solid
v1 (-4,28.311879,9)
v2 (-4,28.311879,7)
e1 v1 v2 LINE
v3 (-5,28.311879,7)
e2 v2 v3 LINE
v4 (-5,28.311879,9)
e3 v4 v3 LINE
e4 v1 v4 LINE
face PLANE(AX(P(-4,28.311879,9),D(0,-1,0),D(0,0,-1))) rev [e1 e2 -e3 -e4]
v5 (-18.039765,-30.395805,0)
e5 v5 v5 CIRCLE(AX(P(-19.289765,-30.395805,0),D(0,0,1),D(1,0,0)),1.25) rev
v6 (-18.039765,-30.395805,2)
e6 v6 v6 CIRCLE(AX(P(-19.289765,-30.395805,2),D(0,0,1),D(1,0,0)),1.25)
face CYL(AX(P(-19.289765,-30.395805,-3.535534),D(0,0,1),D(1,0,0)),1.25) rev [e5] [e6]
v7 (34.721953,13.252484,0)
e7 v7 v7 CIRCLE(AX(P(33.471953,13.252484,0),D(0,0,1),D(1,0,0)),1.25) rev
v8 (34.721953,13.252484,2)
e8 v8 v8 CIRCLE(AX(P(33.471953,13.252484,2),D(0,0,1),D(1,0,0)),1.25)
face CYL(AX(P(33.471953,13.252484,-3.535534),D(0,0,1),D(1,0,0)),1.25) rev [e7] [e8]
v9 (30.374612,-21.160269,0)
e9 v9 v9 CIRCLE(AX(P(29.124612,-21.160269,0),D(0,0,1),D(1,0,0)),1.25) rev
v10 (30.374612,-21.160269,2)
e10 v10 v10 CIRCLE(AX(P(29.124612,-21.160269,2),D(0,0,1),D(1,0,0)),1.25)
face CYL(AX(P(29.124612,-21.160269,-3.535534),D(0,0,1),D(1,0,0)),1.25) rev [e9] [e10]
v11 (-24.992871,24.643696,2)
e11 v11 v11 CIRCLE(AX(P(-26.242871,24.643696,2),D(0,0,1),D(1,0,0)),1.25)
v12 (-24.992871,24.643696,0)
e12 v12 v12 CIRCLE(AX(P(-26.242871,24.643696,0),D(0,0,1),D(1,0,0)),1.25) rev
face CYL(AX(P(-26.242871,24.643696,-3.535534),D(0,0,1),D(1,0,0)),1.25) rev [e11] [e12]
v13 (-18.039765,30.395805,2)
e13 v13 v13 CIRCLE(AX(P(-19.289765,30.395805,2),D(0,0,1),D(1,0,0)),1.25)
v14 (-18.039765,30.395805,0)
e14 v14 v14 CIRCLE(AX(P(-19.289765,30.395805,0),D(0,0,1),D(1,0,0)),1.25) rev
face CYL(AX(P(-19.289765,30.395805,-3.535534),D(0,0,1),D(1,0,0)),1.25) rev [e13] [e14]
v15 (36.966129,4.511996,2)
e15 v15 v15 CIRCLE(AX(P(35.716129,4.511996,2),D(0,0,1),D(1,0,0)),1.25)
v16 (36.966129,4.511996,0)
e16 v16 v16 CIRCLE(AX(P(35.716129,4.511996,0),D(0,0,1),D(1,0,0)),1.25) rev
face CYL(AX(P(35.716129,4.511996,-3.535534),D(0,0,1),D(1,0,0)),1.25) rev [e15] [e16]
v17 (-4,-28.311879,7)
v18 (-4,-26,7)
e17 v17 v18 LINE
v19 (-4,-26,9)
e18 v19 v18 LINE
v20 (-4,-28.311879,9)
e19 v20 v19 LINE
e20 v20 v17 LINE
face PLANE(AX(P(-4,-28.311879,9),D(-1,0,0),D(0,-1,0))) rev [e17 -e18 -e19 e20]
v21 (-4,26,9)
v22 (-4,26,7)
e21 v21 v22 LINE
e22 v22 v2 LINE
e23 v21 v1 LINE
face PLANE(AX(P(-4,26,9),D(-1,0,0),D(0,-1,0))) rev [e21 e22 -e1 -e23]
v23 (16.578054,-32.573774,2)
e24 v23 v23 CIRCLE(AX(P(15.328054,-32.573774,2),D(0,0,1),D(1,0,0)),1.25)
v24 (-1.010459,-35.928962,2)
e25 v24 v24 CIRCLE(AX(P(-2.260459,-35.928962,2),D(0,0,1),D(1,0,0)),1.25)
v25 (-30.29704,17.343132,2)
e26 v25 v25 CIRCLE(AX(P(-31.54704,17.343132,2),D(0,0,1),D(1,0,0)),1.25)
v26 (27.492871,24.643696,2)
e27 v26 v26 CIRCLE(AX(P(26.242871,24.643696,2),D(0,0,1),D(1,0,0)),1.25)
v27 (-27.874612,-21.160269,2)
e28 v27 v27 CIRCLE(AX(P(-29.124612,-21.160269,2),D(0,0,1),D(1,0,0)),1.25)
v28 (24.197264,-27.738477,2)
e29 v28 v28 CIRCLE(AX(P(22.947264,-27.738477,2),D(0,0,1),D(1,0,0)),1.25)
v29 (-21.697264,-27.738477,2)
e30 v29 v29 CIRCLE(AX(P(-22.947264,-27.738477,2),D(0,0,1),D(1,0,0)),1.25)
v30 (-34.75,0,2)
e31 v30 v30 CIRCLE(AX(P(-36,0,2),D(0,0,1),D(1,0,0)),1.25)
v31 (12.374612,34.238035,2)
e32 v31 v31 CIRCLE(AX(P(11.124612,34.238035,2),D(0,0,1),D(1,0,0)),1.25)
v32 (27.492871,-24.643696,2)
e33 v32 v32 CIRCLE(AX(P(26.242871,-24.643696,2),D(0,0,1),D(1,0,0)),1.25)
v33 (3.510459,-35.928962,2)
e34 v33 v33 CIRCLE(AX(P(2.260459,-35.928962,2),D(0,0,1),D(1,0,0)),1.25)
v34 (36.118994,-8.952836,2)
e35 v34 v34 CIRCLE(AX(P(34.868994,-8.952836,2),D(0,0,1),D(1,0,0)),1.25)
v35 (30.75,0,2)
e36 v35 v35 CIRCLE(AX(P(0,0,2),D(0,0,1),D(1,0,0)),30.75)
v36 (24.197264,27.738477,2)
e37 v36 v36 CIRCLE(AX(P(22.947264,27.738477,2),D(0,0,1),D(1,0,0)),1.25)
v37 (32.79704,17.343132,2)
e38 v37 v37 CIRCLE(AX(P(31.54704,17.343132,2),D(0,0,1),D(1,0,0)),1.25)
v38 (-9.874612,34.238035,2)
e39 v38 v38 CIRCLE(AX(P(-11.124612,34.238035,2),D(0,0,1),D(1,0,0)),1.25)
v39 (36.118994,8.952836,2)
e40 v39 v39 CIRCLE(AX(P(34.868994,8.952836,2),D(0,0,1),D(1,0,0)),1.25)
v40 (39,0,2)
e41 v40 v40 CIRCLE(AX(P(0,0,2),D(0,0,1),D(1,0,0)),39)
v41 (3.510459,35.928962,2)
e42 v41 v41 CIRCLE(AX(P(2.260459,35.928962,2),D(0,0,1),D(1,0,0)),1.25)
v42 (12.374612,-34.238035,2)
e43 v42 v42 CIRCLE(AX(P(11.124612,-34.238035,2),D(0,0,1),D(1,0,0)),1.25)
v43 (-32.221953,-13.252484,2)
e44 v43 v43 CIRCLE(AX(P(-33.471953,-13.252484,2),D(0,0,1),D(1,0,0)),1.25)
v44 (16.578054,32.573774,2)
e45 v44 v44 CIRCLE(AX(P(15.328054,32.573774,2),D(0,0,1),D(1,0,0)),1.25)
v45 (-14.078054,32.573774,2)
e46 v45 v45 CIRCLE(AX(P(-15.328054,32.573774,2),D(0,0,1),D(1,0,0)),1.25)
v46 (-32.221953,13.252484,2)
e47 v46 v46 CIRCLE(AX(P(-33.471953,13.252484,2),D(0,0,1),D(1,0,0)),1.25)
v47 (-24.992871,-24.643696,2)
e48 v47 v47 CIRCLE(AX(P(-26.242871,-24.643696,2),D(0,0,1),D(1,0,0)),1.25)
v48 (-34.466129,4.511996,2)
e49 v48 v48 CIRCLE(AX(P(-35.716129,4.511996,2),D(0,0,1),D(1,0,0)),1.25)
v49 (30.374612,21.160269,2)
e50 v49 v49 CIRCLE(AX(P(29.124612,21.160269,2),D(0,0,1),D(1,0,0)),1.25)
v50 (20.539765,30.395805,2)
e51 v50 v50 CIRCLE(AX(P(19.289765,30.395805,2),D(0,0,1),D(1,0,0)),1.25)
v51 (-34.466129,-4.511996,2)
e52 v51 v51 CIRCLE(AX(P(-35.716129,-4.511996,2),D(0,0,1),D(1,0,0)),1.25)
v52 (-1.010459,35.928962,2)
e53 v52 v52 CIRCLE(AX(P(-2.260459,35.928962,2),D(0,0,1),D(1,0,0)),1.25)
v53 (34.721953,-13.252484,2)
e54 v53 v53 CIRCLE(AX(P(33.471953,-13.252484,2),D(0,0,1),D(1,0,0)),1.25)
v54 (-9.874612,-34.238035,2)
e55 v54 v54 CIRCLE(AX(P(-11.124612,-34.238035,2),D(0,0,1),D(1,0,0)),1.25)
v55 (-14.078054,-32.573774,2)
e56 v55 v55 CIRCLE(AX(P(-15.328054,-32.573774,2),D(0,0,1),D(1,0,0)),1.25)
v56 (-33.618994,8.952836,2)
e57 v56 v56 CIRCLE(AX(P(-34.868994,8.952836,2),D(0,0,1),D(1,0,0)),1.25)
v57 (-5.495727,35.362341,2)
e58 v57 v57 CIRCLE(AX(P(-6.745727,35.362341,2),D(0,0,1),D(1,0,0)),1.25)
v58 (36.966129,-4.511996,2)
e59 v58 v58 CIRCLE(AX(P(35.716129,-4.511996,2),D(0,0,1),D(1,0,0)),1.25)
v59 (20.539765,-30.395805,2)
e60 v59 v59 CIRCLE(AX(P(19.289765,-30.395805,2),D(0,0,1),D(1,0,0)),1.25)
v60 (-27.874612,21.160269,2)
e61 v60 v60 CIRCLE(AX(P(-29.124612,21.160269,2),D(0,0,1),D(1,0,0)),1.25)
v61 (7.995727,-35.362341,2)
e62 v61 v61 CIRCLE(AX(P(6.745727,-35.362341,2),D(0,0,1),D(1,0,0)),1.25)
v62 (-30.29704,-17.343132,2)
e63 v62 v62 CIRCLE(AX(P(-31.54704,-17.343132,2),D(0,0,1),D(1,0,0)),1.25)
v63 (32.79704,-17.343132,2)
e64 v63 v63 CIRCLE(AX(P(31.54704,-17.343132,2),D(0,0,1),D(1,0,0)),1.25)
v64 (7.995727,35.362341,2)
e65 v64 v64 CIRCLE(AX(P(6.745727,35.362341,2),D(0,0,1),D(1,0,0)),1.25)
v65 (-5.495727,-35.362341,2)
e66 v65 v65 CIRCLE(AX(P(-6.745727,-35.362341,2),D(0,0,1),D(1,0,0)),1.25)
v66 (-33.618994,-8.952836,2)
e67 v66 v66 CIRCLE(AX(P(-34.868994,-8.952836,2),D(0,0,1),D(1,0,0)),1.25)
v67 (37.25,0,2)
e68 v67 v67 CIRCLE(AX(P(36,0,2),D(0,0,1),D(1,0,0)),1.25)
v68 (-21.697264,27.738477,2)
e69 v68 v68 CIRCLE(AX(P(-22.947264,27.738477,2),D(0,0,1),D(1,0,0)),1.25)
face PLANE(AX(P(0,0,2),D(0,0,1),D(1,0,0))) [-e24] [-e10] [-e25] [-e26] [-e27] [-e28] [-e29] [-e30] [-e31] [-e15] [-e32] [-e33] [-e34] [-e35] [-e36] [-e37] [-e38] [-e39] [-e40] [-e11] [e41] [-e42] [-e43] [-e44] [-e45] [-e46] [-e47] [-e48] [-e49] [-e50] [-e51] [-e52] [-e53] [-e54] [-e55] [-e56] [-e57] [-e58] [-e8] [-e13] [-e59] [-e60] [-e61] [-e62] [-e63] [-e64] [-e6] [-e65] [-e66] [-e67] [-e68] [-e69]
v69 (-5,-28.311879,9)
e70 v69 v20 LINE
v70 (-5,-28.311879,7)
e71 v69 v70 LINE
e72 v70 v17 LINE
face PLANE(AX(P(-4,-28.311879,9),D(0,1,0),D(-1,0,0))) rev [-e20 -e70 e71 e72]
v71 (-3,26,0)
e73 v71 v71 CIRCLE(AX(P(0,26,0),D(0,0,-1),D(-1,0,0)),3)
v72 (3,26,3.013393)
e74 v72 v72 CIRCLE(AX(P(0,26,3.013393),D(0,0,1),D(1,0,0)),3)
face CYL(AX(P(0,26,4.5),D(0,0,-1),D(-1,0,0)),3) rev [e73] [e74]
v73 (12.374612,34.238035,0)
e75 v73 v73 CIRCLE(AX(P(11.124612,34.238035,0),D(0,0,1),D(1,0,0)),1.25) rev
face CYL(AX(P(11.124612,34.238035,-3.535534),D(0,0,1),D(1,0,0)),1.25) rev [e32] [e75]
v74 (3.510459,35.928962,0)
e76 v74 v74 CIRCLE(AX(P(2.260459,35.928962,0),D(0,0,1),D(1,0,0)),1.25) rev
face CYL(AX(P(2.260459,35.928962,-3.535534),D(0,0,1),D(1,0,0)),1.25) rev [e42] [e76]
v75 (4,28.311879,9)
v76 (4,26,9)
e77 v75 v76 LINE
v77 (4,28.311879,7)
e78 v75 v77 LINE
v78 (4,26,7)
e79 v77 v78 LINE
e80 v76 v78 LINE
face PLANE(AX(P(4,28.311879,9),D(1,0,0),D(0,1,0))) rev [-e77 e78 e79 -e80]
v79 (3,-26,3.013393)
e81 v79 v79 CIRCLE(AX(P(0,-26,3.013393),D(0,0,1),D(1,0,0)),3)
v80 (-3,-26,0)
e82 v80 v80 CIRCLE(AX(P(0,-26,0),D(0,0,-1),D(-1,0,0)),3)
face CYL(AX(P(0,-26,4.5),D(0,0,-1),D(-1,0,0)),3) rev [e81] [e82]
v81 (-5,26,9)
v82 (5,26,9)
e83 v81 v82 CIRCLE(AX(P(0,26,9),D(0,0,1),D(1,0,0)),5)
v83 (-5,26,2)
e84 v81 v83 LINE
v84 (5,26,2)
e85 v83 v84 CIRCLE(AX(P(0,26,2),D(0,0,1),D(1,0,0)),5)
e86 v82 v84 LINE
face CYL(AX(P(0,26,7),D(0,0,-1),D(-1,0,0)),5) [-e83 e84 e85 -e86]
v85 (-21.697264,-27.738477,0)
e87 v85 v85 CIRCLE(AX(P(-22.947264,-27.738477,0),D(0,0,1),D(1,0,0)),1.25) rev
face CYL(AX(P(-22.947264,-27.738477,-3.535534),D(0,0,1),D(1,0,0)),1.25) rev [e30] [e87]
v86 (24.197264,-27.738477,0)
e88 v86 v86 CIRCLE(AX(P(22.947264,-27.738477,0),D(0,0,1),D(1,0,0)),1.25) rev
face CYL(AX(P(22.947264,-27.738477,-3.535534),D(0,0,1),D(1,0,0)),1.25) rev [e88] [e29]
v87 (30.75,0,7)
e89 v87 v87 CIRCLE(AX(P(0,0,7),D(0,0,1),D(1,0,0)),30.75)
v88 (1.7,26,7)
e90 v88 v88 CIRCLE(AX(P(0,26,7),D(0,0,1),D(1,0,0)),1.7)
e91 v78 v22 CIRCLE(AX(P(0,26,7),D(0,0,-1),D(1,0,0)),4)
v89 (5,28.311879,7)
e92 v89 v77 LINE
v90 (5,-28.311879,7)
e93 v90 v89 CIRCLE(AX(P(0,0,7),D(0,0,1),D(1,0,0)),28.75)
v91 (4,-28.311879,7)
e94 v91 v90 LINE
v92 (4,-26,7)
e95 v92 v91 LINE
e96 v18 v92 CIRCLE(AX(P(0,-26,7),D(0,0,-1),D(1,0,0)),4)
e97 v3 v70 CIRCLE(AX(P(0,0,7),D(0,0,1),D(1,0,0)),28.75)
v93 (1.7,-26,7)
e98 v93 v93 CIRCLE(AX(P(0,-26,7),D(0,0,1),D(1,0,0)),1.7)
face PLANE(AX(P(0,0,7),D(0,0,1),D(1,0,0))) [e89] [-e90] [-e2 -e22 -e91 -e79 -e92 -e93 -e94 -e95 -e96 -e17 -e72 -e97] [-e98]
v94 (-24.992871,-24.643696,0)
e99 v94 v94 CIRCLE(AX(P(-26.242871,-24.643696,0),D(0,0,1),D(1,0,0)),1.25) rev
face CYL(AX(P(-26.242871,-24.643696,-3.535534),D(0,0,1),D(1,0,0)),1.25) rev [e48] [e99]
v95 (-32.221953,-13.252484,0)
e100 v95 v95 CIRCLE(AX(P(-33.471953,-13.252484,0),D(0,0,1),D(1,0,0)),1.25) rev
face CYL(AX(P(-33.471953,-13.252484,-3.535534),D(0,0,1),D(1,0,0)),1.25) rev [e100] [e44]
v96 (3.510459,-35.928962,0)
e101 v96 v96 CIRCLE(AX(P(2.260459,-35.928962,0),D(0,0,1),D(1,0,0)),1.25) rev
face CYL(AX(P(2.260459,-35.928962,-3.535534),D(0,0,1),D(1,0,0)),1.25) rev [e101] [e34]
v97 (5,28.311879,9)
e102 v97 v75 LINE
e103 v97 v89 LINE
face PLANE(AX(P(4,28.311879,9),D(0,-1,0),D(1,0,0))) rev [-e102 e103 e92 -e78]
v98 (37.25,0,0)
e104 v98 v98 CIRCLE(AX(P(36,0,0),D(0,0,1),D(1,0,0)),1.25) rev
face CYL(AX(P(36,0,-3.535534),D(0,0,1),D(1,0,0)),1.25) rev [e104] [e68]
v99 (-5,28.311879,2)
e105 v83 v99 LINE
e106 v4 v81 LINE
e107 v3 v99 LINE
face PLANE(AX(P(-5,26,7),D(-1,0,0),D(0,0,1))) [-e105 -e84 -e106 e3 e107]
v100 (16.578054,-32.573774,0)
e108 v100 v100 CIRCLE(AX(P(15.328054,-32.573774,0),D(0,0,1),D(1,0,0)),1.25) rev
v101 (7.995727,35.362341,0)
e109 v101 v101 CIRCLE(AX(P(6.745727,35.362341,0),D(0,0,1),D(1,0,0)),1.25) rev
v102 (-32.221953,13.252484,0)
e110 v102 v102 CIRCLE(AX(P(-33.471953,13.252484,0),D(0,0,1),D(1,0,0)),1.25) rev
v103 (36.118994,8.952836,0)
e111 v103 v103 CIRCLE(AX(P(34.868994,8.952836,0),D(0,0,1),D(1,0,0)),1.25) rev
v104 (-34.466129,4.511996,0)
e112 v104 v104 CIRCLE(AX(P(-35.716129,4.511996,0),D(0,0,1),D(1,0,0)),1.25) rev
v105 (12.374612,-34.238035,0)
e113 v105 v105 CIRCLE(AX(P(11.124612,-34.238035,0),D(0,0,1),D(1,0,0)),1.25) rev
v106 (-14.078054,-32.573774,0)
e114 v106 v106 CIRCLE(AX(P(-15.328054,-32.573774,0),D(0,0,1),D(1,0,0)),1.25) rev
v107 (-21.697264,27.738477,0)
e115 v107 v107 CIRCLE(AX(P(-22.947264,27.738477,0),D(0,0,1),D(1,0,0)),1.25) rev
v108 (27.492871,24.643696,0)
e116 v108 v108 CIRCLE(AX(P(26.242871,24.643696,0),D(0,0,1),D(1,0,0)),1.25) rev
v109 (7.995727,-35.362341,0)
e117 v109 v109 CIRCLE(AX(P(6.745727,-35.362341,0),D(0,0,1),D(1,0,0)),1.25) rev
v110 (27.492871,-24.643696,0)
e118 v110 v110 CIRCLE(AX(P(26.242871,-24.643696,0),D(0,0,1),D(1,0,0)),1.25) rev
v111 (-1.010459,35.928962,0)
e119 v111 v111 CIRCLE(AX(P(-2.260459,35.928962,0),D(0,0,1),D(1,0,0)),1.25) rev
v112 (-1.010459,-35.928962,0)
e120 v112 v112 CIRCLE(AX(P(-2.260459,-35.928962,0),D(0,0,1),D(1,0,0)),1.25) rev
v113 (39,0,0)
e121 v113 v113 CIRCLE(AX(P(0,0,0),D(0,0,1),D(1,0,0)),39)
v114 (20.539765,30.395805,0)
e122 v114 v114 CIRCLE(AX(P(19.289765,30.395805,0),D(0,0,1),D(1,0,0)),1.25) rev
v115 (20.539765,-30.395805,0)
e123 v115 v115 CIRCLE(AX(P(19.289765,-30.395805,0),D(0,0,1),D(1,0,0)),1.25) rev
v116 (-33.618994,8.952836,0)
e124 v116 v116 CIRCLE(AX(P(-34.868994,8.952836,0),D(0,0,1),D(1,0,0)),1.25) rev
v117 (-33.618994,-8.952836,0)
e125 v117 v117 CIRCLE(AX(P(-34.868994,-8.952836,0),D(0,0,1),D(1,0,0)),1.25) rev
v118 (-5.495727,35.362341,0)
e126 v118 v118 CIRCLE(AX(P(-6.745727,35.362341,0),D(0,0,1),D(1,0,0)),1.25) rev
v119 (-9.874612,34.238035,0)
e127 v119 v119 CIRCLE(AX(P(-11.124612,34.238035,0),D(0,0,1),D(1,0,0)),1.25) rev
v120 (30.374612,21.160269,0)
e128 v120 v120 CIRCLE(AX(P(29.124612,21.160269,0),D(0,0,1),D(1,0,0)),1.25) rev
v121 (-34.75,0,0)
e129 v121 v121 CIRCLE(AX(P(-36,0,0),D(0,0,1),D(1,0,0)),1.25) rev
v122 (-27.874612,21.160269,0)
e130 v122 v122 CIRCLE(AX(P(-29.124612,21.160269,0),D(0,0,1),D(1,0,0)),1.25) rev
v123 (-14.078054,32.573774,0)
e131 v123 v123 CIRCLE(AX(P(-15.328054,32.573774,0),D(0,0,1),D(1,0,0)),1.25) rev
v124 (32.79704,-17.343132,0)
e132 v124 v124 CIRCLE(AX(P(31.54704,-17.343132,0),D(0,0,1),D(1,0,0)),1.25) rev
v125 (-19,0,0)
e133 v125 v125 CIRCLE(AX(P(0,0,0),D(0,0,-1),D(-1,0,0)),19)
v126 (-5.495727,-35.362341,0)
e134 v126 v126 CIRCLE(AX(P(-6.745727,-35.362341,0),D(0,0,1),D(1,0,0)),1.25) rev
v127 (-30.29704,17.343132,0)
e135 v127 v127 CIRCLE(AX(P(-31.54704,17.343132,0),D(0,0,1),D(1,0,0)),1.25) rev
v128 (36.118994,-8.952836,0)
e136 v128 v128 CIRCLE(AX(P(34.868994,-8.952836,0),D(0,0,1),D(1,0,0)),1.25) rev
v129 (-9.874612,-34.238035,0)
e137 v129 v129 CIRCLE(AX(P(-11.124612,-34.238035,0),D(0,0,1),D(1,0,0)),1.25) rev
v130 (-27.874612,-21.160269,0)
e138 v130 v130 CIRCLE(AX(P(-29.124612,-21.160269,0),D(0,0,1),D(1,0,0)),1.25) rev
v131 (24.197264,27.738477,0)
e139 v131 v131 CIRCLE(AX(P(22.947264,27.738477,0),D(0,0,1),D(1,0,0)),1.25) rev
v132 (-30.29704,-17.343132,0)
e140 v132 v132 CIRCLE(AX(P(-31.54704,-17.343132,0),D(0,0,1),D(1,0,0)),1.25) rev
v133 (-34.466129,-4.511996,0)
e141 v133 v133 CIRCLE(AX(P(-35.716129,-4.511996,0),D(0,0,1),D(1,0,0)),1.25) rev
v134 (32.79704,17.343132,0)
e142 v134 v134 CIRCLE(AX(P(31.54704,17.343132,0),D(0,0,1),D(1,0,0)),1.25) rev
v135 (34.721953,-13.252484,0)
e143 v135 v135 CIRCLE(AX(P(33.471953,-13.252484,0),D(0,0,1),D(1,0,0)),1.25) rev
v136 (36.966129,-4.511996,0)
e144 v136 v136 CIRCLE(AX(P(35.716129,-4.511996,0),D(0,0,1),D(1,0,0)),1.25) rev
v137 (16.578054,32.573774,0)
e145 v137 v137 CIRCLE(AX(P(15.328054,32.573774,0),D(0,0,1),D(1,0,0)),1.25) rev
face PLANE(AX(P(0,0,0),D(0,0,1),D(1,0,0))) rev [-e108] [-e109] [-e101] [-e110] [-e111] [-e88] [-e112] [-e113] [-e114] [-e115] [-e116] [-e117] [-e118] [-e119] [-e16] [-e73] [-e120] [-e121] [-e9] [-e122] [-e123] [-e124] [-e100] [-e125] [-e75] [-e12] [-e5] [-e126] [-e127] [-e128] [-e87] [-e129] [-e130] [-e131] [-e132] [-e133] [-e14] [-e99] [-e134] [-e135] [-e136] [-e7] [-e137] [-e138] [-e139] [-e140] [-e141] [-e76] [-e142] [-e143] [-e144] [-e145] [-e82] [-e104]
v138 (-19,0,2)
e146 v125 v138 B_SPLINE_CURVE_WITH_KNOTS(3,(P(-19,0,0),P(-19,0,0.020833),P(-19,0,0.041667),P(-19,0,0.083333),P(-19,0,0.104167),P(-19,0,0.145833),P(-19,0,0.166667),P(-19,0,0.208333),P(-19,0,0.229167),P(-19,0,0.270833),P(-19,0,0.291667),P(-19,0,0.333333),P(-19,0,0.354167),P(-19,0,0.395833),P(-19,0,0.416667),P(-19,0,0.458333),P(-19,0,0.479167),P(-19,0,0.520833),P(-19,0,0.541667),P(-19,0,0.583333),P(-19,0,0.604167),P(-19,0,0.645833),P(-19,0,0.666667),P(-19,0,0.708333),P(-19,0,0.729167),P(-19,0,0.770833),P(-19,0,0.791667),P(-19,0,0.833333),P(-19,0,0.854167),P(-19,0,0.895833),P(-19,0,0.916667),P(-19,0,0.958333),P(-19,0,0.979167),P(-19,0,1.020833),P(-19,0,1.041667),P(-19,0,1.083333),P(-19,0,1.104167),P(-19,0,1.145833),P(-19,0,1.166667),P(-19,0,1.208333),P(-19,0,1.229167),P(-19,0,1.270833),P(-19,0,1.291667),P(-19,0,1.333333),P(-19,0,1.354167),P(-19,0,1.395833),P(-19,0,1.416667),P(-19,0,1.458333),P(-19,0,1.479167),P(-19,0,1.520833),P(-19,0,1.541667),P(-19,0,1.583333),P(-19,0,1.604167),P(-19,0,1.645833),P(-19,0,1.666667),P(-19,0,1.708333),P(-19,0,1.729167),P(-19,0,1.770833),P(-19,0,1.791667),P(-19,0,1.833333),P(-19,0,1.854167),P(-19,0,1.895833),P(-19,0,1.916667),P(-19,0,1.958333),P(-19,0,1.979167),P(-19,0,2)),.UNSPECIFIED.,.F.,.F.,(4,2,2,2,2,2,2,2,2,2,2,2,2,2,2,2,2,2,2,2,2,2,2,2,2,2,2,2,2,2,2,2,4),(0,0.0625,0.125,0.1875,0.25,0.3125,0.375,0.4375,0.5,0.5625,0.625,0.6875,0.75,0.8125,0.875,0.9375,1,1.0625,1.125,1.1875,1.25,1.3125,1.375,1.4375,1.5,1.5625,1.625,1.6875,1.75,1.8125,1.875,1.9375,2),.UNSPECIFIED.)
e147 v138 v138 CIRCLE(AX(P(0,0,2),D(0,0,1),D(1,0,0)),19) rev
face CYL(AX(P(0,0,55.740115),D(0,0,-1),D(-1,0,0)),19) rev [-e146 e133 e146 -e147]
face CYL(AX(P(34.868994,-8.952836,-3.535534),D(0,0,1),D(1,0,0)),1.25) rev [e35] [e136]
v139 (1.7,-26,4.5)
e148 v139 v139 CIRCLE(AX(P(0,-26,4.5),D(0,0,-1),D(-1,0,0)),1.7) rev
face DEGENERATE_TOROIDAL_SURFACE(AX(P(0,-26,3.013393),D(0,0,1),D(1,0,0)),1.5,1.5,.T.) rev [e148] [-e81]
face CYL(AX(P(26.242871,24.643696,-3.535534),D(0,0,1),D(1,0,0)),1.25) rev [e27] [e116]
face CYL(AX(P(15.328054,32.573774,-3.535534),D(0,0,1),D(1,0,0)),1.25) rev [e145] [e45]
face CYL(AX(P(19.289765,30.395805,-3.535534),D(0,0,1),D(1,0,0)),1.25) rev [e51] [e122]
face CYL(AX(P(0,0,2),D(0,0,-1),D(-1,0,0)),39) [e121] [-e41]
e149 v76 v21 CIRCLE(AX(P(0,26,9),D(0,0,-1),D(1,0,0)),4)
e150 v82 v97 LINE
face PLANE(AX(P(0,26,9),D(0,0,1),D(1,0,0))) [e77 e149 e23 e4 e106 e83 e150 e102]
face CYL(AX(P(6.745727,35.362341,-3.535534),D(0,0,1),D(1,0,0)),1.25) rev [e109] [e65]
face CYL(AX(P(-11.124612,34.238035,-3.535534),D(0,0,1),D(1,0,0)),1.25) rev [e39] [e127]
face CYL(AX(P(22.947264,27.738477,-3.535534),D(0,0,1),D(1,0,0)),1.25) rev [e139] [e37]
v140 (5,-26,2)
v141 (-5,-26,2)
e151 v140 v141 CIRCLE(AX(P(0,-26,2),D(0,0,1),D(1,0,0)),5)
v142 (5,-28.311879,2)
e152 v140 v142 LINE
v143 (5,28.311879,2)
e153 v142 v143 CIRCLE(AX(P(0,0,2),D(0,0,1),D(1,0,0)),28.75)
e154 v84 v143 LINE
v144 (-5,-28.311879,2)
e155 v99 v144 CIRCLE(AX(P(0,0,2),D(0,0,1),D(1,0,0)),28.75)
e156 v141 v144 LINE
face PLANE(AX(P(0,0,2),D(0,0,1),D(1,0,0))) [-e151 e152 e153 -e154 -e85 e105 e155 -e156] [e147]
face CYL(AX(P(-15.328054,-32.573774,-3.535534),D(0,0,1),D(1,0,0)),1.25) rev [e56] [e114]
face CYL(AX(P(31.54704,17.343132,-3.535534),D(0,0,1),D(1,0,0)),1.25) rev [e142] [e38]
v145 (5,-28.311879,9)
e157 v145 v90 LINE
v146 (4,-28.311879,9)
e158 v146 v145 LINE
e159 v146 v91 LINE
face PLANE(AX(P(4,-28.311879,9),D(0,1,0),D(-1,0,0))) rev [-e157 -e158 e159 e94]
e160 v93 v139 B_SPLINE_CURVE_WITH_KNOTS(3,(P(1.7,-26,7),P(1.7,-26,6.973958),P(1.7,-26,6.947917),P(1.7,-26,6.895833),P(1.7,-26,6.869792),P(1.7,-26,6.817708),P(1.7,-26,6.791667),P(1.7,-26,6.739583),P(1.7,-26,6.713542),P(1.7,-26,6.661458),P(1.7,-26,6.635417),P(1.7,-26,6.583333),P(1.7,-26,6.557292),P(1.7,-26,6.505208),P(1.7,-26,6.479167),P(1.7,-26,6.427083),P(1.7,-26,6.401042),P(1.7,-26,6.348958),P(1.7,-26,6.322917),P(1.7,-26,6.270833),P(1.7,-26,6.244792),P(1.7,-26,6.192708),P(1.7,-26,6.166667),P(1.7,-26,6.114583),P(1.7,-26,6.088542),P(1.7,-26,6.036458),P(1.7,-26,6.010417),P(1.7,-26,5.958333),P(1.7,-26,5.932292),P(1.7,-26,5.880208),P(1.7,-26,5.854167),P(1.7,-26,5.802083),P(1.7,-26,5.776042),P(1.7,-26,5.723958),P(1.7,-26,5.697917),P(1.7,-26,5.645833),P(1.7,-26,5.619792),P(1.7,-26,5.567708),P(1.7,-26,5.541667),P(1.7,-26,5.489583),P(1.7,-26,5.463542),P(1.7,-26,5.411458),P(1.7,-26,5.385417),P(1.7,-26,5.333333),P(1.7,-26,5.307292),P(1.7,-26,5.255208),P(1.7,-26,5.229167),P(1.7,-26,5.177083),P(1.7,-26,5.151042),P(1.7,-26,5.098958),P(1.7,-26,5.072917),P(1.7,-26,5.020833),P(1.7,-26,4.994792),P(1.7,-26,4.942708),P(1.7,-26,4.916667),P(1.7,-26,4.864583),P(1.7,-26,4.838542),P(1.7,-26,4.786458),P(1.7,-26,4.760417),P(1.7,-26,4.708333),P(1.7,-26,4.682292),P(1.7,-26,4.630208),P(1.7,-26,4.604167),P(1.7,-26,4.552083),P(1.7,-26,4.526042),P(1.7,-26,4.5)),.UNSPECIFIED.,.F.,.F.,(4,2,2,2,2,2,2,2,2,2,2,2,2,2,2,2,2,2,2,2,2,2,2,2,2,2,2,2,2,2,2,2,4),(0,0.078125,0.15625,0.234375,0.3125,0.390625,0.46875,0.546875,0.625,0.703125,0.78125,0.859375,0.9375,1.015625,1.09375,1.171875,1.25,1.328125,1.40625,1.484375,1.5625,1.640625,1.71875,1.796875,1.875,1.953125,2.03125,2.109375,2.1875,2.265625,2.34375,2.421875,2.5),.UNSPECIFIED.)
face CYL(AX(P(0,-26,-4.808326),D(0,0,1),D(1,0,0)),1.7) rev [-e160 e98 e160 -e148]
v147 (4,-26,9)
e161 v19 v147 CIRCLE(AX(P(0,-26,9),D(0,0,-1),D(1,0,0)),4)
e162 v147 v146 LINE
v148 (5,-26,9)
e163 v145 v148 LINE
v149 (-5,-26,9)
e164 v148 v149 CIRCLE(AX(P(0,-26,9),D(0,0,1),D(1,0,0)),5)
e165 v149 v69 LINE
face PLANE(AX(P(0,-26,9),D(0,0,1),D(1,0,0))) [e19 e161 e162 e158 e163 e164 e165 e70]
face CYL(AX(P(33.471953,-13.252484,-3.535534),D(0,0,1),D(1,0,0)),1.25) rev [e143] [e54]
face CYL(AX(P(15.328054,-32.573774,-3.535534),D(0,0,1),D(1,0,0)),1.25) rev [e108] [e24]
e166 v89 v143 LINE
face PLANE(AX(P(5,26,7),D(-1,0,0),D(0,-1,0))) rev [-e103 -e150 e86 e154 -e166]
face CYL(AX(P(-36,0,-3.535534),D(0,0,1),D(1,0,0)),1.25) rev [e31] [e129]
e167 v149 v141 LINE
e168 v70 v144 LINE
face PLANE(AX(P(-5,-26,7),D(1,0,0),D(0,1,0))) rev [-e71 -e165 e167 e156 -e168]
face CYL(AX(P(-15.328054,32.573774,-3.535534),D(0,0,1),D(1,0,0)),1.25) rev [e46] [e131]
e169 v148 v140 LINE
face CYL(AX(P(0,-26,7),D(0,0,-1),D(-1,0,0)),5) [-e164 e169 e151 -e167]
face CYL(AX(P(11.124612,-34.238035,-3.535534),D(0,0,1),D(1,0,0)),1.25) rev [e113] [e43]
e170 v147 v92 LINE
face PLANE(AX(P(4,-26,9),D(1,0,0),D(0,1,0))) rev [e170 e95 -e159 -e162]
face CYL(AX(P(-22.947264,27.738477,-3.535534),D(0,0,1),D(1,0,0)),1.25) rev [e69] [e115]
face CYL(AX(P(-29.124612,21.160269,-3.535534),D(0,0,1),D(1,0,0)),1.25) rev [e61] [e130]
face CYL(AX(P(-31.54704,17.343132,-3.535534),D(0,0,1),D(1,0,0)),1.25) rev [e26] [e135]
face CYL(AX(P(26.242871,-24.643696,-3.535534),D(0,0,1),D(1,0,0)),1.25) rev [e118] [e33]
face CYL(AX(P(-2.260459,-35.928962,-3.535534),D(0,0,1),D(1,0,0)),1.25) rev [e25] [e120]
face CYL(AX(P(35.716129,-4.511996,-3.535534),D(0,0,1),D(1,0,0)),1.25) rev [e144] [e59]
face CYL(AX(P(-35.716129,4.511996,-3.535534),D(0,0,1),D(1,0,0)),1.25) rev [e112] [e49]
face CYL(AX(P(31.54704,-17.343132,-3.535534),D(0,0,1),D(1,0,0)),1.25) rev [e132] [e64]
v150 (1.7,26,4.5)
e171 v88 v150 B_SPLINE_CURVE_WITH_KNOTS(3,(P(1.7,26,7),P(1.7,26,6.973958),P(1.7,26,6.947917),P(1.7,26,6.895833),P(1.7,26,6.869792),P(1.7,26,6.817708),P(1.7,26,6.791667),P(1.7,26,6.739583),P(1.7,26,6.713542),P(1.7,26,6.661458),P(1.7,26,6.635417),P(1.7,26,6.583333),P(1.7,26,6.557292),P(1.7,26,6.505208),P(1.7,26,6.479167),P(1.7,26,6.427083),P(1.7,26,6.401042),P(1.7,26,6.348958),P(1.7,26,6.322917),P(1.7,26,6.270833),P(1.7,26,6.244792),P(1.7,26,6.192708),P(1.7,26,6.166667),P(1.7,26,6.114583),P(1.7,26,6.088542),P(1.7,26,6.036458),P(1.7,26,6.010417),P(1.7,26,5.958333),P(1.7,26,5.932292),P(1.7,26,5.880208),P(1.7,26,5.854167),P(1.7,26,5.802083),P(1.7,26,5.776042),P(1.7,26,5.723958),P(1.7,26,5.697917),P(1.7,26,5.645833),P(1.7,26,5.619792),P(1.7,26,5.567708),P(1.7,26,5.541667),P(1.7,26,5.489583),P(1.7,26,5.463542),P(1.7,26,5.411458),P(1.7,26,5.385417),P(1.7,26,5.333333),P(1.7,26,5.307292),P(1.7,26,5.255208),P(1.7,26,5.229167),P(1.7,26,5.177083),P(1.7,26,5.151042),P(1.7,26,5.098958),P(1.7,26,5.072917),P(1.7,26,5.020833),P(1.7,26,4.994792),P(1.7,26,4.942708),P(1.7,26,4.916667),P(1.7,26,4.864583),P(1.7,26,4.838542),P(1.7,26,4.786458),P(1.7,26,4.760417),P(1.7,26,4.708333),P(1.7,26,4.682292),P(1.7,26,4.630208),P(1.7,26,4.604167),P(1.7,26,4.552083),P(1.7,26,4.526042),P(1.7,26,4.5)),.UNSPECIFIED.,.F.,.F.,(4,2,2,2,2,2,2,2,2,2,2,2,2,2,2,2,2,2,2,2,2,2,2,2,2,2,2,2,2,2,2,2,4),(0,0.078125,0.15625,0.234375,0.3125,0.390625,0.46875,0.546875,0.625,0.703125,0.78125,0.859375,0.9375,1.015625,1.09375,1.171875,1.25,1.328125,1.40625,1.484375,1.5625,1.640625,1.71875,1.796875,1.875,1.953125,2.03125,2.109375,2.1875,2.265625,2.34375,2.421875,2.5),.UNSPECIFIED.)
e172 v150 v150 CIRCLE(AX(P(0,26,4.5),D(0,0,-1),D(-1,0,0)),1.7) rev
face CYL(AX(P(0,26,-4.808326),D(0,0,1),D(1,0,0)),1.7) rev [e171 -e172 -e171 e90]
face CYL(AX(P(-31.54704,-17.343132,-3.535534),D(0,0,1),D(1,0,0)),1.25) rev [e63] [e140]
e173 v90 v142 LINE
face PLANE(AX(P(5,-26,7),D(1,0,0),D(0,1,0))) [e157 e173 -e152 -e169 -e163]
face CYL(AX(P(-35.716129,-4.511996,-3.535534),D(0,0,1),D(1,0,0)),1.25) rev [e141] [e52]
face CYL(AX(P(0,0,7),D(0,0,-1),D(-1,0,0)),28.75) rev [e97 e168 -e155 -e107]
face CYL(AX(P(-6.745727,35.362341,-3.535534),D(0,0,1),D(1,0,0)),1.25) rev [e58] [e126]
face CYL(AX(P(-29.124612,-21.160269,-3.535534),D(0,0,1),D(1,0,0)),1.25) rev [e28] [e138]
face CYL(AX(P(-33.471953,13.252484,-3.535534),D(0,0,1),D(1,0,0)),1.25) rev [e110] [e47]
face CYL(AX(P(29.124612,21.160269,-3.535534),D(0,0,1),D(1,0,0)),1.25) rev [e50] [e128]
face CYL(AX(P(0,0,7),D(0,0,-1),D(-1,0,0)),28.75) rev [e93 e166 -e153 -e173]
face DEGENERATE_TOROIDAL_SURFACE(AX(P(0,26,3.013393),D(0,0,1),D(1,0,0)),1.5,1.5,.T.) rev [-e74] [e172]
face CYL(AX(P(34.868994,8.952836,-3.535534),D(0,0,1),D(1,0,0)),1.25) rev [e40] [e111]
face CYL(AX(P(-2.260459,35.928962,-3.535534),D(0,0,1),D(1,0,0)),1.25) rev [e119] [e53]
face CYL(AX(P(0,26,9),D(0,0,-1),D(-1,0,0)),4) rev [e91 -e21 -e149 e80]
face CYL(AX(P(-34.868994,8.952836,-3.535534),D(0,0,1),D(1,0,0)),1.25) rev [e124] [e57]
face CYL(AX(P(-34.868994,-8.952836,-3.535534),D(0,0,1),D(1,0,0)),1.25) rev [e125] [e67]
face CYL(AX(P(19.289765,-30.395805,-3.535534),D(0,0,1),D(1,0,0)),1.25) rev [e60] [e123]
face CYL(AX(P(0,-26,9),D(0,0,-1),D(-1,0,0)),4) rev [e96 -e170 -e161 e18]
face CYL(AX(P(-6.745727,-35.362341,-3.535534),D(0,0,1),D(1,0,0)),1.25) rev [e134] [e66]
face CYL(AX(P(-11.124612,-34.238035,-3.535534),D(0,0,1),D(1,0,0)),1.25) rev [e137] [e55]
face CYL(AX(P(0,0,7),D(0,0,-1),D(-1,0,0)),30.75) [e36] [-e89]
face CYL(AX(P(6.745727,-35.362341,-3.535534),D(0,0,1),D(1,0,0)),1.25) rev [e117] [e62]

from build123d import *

# Parameters (mm, degrees)
SKETCH1_R           = 39
BOSS_EXTRUDE1_DEPTH = 2
SKETCH3_R           = 30.75
BOSS_EXTRUDE2_DEPTH = 5
SKETCH5_R           = 1.7
CUT_EXTRUDE2_DEPTH  = 7
SKETCH6_R           = 3
CUT_EXTRUDE3_DEPTH  = 4.5
SKETCH7_R           = 19
CUT_EXTRUDE4_DEPTH  = 2
SKETCH8_R           = 1.25
CUT_EXTRUDE5_DEPTH  = 2
FILLET1_R           = 1.5
BOSS_EXTRUDE3_DEPTH = 2


with BuildPart() as part:
    # Sketch1 → Boss-Extrude1 (new body)
    with BuildSketch(Plane.XY):
        Circle(SKETCH1_R)
    extrude(amount=BOSS_EXTRUDE1_DEPTH)

    # Sketch3 → Boss-Extrude2 (add)
    with BuildSketch(Plane.XY.offset(2)):
        Circle(SKETCH3_R)
        with BuildLine():
            Line((-5, 26), (-5, 28.311879132))
            ThreePointArc((-5, 28.311879132), (-28.75, 0), (-5, -28.311879132))
            Line((-5, -28.311879132), (-5, -26))
            ThreePointArc((-5, -26), (0, -21), (5, -26))
            Line((5, -26), (5, -28.311879132))
            ThreePointArc((5, -28.311879132), (28.75, 0), (5, 28.311879132))
            Line((5, 28.311879132), (5, 26))
            ThreePointArc((5, 26), (0, 21), (-5, 26))
        make_face(mode=Mode.SUBTRACT)
    extrude(amount=BOSS_EXTRUDE2_DEPTH)

    # Sketch5 → Cut-Extrude2 (cut)
    with BuildSketch(Plane.XY.offset(7)):
        with Locations((0, -26)):
            Circle(SKETCH5_R)
        with Locations((0, 26)):
            Circle(SKETCH5_R)
    extrude(amount=-CUT_EXTRUDE2_DEPTH, mode=Mode.SUBTRACT)

    # Sketch6 → Cut-Extrude3 (cut)
    with BuildSketch(Plane(origin=(0, 0, 0), x_dir=(-1, 0, 0), z_dir=(0, 0, -1))):
        with Locations((0, 26)):
            Circle(SKETCH6_R)
        with Locations((0, -26)):
            Circle(SKETCH6_R)
    extrude(amount=-CUT_EXTRUDE3_DEPTH, mode=Mode.SUBTRACT)

    # Sketch7 → Cut-Extrude4 (cut)
    with BuildSketch(Plane(origin=(0, 0, 0), x_dir=(-1, 0, 0), z_dir=(0, 0, -1))):
        Circle(SKETCH7_R)
    extrude(amount=-CUT_EXTRUDE4_DEPTH, mode=Mode.SUBTRACT)

    # Sketch8 → Cut-Extrude5 (cut)
    with BuildSketch(Plane.XY.offset(2)):
        with Locations((36, 0)):
            Circle(SKETCH8_R)
        with Locations((35.716129247, -4.511996408)):
            Circle(SKETCH8_R)
        with Locations((34.868993801, -8.952835938)):
            Circle(SKETCH8_R)
        with Locations((33.471953492, -13.252483897)):
            Circle(SKETCH8_R)
        with Locations((31.547040482, -17.343132268)):
            Circle(SKETCH8_R)
        with Locations((29.124611797, -21.160269083)):
            Circle(SKETCH8_R)
        with Locations((26.242870587, -24.643695813)):
            Circle(SKETCH8_R)
        with Locations((22.947263631, -27.73847674)):
            Circle(SKETCH8_R)
        with Locations((19.289764619, -30.395805318)):
            Circle(SKETCH8_R)
        with Locations((15.328054496, -32.573773889)):
            Circle(SKETCH8_R)
        with Locations((11.124611797, -34.238034587)):
            Circle(SKETCH8_R)
        with Locations((6.745727325, -35.362341026)):
            Circle(SKETCH8_R)
        with Locations((2.260458703, -35.928962223)):
            Circle(SKETCH8_R)
        with Locations((-2.260458703, -35.928962223)):
            Circle(SKETCH8_R)
        with Locations((-6.745727325, -35.362341026)):
            Circle(SKETCH8_R)
        with Locations((-11.124611797, -34.238034587)):
            Circle(SKETCH8_R)
        with Locations((-15.328054496, -32.573773889)):
            Circle(SKETCH8_R)
        with Locations((-19.289764619, -30.395805318)):
            Circle(SKETCH8_R)
        with Locations((-22.947263631, -27.73847674)):
            Circle(SKETCH8_R)
        with Locations((-26.242870587, -24.643695813)):
            Circle(SKETCH8_R)
        with Locations((-29.124611797, -21.160269083)):
            Circle(SKETCH8_R)
        with Locations((-31.547040482, -17.343132268)):
            Circle(SKETCH8_R)
        with Locations((-33.471953492, -13.252483897)):
            Circle(SKETCH8_R)
        with Locations((-34.868993801, -8.952835938)):
            Circle(SKETCH8_R)
        with Locations((-35.716129247, -4.511996408)):
            Circle(SKETCH8_R)
        with Locations((-36, 0)):
            Circle(SKETCH8_R)
        with Locations((-35.716129247, 4.511996408)):
            Circle(SKETCH8_R)
        with Locations((-34.868993801, 8.952835938)):
            Circle(SKETCH8_R)
        with Locations((-33.471953492, 13.252483897)):
            Circle(SKETCH8_R)
        with Locations((-31.547040482, 17.343132268)):
            Circle(SKETCH8_R)
        with Locations((-29.124611797, 21.160269083)):
            Circle(SKETCH8_R)
        with Locations((-26.242870587, 24.643695813)):
            Circle(SKETCH8_R)
        with Locations((-22.947263631, 27.73847674)):
            Circle(SKETCH8_R)
        with Locations((-19.289764619, 30.395805318)):
            Circle(SKETCH8_R)
        with Locations((-15.328054496, 32.573773889)):
            Circle(SKETCH8_R)
        with Locations((-11.124611797, 34.238034587)):
            Circle(SKETCH8_R)
        with Locations((-6.745727325, 35.362341026)):
            Circle(SKETCH8_R)
        with Locations((-2.260458703, 35.928962223)):
            Circle(SKETCH8_R)
        with Locations((2.260458703, 35.928962223)):
            Circle(SKETCH8_R)
        with Locations((6.745727325, 35.362341026)):
            Circle(SKETCH8_R)
        with Locations((11.124611797, 34.238034587)):
            Circle(SKETCH8_R)
        with Locations((15.328054496, 32.573773889)):
            Circle(SKETCH8_R)
        with Locations((19.289764619, 30.395805318)):
            Circle(SKETCH8_R)
        with Locations((22.947263631, 27.73847674)):
            Circle(SKETCH8_R)
        with Locations((26.242870587, 24.643695813)):
            Circle(SKETCH8_R)
        with Locations((29.124611797, 21.160269083)):
            Circle(SKETCH8_R)
        with Locations((31.547040482, 17.343132268)):
            Circle(SKETCH8_R)
        with Locations((33.471953492, 13.252483897)):
            Circle(SKETCH8_R)
        with Locations((34.868993801, 8.952835938)):
            Circle(SKETCH8_R)
        with Locations((35.716129247, 4.511996408)):
            Circle(SKETCH8_R)
    extrude(amount=-CUT_EXTRUDE5_DEPTH, mode=Mode.SUBTRACT)

    # Fillet1
    # the kernel refuses this fillet: 1.5 mm, written as the material it adds along each edge
    with BuildSketch(Plane(origin=(0, 26, 4.5), x_dir=(-1, 0, 0), z_dir=(0, -1, 0))) as fillet1_piece_1:
        with BuildLine():
            CenterArc((1.5, 1.486606875), FILLET1_R, 277.662255661, 82.337744339)
            Line((1.7, 0), (1.704, -0.029732137))
            ThreePointArc((1.704, -0.029732137), (2.35, -0.03), (3, -0.03))
            Line((3, -0.03), (3.03, 0))
            Line((3.03, 0), (3.03, 1.486606875))
            Line((3.03, 1.486606875), (3, 1.486606875))
        make_face()
    revolve(axis=Axis((0, 26, 4.5), (0, 0, -1)))
    with BuildSketch(Plane(origin=(0, -26, 4.5), x_dir=(-1, 0, 0), z_dir=(0, -1, 0))) as fillet1_piece_2:
        with BuildLine():
            CenterArc((1.5, 1.486606875), FILLET1_R, 277.662255661, 82.337744339)
            Line((1.7, 0), (1.704, -0.029732137))
            ThreePointArc((1.704, -0.029732137), (2.35, -0.03), (3, -0.03))
            Line((3, -0.03), (3.03, 0))
            Line((3.03, 0), (3.03, 1.486606875))
            Line((3.03, 1.486606875), (3, 1.486606875))
        make_face()
    revolve(axis=Axis((0, -26, 4.5), (0, 0, -1)))

    # Sketch9 → Boss-Extrude3 (add)
    with BuildSketch(Plane.XY.offset(7)):
        with BuildLine():
            Line((-4, 28.311879132), (-5, 28.311879132))
            Line((-5, 28.311879132), (-5, 26))
            ThreePointArc((-5, 26), (0, 21), (5, 26))
            Line((5, 26), (5, 28.311879132))
            Line((5, 28.311879132), (4, 28.311879132))
            Line((4, 28.311879132), (4, 26))
            ThreePointArc((4, 26), (0, 22), (-4, 26))
            Line((-4, 26), (-4, 28.311879132))
        make_face()
        with BuildLine():
            Line((-5, -26), (-5, -28.311879132))
            Line((-5, -28.311879132), (-4, -28.311879132))
            Line((-4, -28.311879132), (-4, -26))
            ThreePointArc((-4, -26), (0, -22), (4, -26))
            Line((4, -26), (4, -28.311879132))
            Line((4, -28.311879132), (5, -28.311879132))
            Line((5, -28.311879132), (5, -26))
            ThreePointArc((5, -26), (0, -21), (-5, -26))
        make_face()
    extrude(amount=BOSS_EXTRUDE3_DEPTH)


solid = part.part
